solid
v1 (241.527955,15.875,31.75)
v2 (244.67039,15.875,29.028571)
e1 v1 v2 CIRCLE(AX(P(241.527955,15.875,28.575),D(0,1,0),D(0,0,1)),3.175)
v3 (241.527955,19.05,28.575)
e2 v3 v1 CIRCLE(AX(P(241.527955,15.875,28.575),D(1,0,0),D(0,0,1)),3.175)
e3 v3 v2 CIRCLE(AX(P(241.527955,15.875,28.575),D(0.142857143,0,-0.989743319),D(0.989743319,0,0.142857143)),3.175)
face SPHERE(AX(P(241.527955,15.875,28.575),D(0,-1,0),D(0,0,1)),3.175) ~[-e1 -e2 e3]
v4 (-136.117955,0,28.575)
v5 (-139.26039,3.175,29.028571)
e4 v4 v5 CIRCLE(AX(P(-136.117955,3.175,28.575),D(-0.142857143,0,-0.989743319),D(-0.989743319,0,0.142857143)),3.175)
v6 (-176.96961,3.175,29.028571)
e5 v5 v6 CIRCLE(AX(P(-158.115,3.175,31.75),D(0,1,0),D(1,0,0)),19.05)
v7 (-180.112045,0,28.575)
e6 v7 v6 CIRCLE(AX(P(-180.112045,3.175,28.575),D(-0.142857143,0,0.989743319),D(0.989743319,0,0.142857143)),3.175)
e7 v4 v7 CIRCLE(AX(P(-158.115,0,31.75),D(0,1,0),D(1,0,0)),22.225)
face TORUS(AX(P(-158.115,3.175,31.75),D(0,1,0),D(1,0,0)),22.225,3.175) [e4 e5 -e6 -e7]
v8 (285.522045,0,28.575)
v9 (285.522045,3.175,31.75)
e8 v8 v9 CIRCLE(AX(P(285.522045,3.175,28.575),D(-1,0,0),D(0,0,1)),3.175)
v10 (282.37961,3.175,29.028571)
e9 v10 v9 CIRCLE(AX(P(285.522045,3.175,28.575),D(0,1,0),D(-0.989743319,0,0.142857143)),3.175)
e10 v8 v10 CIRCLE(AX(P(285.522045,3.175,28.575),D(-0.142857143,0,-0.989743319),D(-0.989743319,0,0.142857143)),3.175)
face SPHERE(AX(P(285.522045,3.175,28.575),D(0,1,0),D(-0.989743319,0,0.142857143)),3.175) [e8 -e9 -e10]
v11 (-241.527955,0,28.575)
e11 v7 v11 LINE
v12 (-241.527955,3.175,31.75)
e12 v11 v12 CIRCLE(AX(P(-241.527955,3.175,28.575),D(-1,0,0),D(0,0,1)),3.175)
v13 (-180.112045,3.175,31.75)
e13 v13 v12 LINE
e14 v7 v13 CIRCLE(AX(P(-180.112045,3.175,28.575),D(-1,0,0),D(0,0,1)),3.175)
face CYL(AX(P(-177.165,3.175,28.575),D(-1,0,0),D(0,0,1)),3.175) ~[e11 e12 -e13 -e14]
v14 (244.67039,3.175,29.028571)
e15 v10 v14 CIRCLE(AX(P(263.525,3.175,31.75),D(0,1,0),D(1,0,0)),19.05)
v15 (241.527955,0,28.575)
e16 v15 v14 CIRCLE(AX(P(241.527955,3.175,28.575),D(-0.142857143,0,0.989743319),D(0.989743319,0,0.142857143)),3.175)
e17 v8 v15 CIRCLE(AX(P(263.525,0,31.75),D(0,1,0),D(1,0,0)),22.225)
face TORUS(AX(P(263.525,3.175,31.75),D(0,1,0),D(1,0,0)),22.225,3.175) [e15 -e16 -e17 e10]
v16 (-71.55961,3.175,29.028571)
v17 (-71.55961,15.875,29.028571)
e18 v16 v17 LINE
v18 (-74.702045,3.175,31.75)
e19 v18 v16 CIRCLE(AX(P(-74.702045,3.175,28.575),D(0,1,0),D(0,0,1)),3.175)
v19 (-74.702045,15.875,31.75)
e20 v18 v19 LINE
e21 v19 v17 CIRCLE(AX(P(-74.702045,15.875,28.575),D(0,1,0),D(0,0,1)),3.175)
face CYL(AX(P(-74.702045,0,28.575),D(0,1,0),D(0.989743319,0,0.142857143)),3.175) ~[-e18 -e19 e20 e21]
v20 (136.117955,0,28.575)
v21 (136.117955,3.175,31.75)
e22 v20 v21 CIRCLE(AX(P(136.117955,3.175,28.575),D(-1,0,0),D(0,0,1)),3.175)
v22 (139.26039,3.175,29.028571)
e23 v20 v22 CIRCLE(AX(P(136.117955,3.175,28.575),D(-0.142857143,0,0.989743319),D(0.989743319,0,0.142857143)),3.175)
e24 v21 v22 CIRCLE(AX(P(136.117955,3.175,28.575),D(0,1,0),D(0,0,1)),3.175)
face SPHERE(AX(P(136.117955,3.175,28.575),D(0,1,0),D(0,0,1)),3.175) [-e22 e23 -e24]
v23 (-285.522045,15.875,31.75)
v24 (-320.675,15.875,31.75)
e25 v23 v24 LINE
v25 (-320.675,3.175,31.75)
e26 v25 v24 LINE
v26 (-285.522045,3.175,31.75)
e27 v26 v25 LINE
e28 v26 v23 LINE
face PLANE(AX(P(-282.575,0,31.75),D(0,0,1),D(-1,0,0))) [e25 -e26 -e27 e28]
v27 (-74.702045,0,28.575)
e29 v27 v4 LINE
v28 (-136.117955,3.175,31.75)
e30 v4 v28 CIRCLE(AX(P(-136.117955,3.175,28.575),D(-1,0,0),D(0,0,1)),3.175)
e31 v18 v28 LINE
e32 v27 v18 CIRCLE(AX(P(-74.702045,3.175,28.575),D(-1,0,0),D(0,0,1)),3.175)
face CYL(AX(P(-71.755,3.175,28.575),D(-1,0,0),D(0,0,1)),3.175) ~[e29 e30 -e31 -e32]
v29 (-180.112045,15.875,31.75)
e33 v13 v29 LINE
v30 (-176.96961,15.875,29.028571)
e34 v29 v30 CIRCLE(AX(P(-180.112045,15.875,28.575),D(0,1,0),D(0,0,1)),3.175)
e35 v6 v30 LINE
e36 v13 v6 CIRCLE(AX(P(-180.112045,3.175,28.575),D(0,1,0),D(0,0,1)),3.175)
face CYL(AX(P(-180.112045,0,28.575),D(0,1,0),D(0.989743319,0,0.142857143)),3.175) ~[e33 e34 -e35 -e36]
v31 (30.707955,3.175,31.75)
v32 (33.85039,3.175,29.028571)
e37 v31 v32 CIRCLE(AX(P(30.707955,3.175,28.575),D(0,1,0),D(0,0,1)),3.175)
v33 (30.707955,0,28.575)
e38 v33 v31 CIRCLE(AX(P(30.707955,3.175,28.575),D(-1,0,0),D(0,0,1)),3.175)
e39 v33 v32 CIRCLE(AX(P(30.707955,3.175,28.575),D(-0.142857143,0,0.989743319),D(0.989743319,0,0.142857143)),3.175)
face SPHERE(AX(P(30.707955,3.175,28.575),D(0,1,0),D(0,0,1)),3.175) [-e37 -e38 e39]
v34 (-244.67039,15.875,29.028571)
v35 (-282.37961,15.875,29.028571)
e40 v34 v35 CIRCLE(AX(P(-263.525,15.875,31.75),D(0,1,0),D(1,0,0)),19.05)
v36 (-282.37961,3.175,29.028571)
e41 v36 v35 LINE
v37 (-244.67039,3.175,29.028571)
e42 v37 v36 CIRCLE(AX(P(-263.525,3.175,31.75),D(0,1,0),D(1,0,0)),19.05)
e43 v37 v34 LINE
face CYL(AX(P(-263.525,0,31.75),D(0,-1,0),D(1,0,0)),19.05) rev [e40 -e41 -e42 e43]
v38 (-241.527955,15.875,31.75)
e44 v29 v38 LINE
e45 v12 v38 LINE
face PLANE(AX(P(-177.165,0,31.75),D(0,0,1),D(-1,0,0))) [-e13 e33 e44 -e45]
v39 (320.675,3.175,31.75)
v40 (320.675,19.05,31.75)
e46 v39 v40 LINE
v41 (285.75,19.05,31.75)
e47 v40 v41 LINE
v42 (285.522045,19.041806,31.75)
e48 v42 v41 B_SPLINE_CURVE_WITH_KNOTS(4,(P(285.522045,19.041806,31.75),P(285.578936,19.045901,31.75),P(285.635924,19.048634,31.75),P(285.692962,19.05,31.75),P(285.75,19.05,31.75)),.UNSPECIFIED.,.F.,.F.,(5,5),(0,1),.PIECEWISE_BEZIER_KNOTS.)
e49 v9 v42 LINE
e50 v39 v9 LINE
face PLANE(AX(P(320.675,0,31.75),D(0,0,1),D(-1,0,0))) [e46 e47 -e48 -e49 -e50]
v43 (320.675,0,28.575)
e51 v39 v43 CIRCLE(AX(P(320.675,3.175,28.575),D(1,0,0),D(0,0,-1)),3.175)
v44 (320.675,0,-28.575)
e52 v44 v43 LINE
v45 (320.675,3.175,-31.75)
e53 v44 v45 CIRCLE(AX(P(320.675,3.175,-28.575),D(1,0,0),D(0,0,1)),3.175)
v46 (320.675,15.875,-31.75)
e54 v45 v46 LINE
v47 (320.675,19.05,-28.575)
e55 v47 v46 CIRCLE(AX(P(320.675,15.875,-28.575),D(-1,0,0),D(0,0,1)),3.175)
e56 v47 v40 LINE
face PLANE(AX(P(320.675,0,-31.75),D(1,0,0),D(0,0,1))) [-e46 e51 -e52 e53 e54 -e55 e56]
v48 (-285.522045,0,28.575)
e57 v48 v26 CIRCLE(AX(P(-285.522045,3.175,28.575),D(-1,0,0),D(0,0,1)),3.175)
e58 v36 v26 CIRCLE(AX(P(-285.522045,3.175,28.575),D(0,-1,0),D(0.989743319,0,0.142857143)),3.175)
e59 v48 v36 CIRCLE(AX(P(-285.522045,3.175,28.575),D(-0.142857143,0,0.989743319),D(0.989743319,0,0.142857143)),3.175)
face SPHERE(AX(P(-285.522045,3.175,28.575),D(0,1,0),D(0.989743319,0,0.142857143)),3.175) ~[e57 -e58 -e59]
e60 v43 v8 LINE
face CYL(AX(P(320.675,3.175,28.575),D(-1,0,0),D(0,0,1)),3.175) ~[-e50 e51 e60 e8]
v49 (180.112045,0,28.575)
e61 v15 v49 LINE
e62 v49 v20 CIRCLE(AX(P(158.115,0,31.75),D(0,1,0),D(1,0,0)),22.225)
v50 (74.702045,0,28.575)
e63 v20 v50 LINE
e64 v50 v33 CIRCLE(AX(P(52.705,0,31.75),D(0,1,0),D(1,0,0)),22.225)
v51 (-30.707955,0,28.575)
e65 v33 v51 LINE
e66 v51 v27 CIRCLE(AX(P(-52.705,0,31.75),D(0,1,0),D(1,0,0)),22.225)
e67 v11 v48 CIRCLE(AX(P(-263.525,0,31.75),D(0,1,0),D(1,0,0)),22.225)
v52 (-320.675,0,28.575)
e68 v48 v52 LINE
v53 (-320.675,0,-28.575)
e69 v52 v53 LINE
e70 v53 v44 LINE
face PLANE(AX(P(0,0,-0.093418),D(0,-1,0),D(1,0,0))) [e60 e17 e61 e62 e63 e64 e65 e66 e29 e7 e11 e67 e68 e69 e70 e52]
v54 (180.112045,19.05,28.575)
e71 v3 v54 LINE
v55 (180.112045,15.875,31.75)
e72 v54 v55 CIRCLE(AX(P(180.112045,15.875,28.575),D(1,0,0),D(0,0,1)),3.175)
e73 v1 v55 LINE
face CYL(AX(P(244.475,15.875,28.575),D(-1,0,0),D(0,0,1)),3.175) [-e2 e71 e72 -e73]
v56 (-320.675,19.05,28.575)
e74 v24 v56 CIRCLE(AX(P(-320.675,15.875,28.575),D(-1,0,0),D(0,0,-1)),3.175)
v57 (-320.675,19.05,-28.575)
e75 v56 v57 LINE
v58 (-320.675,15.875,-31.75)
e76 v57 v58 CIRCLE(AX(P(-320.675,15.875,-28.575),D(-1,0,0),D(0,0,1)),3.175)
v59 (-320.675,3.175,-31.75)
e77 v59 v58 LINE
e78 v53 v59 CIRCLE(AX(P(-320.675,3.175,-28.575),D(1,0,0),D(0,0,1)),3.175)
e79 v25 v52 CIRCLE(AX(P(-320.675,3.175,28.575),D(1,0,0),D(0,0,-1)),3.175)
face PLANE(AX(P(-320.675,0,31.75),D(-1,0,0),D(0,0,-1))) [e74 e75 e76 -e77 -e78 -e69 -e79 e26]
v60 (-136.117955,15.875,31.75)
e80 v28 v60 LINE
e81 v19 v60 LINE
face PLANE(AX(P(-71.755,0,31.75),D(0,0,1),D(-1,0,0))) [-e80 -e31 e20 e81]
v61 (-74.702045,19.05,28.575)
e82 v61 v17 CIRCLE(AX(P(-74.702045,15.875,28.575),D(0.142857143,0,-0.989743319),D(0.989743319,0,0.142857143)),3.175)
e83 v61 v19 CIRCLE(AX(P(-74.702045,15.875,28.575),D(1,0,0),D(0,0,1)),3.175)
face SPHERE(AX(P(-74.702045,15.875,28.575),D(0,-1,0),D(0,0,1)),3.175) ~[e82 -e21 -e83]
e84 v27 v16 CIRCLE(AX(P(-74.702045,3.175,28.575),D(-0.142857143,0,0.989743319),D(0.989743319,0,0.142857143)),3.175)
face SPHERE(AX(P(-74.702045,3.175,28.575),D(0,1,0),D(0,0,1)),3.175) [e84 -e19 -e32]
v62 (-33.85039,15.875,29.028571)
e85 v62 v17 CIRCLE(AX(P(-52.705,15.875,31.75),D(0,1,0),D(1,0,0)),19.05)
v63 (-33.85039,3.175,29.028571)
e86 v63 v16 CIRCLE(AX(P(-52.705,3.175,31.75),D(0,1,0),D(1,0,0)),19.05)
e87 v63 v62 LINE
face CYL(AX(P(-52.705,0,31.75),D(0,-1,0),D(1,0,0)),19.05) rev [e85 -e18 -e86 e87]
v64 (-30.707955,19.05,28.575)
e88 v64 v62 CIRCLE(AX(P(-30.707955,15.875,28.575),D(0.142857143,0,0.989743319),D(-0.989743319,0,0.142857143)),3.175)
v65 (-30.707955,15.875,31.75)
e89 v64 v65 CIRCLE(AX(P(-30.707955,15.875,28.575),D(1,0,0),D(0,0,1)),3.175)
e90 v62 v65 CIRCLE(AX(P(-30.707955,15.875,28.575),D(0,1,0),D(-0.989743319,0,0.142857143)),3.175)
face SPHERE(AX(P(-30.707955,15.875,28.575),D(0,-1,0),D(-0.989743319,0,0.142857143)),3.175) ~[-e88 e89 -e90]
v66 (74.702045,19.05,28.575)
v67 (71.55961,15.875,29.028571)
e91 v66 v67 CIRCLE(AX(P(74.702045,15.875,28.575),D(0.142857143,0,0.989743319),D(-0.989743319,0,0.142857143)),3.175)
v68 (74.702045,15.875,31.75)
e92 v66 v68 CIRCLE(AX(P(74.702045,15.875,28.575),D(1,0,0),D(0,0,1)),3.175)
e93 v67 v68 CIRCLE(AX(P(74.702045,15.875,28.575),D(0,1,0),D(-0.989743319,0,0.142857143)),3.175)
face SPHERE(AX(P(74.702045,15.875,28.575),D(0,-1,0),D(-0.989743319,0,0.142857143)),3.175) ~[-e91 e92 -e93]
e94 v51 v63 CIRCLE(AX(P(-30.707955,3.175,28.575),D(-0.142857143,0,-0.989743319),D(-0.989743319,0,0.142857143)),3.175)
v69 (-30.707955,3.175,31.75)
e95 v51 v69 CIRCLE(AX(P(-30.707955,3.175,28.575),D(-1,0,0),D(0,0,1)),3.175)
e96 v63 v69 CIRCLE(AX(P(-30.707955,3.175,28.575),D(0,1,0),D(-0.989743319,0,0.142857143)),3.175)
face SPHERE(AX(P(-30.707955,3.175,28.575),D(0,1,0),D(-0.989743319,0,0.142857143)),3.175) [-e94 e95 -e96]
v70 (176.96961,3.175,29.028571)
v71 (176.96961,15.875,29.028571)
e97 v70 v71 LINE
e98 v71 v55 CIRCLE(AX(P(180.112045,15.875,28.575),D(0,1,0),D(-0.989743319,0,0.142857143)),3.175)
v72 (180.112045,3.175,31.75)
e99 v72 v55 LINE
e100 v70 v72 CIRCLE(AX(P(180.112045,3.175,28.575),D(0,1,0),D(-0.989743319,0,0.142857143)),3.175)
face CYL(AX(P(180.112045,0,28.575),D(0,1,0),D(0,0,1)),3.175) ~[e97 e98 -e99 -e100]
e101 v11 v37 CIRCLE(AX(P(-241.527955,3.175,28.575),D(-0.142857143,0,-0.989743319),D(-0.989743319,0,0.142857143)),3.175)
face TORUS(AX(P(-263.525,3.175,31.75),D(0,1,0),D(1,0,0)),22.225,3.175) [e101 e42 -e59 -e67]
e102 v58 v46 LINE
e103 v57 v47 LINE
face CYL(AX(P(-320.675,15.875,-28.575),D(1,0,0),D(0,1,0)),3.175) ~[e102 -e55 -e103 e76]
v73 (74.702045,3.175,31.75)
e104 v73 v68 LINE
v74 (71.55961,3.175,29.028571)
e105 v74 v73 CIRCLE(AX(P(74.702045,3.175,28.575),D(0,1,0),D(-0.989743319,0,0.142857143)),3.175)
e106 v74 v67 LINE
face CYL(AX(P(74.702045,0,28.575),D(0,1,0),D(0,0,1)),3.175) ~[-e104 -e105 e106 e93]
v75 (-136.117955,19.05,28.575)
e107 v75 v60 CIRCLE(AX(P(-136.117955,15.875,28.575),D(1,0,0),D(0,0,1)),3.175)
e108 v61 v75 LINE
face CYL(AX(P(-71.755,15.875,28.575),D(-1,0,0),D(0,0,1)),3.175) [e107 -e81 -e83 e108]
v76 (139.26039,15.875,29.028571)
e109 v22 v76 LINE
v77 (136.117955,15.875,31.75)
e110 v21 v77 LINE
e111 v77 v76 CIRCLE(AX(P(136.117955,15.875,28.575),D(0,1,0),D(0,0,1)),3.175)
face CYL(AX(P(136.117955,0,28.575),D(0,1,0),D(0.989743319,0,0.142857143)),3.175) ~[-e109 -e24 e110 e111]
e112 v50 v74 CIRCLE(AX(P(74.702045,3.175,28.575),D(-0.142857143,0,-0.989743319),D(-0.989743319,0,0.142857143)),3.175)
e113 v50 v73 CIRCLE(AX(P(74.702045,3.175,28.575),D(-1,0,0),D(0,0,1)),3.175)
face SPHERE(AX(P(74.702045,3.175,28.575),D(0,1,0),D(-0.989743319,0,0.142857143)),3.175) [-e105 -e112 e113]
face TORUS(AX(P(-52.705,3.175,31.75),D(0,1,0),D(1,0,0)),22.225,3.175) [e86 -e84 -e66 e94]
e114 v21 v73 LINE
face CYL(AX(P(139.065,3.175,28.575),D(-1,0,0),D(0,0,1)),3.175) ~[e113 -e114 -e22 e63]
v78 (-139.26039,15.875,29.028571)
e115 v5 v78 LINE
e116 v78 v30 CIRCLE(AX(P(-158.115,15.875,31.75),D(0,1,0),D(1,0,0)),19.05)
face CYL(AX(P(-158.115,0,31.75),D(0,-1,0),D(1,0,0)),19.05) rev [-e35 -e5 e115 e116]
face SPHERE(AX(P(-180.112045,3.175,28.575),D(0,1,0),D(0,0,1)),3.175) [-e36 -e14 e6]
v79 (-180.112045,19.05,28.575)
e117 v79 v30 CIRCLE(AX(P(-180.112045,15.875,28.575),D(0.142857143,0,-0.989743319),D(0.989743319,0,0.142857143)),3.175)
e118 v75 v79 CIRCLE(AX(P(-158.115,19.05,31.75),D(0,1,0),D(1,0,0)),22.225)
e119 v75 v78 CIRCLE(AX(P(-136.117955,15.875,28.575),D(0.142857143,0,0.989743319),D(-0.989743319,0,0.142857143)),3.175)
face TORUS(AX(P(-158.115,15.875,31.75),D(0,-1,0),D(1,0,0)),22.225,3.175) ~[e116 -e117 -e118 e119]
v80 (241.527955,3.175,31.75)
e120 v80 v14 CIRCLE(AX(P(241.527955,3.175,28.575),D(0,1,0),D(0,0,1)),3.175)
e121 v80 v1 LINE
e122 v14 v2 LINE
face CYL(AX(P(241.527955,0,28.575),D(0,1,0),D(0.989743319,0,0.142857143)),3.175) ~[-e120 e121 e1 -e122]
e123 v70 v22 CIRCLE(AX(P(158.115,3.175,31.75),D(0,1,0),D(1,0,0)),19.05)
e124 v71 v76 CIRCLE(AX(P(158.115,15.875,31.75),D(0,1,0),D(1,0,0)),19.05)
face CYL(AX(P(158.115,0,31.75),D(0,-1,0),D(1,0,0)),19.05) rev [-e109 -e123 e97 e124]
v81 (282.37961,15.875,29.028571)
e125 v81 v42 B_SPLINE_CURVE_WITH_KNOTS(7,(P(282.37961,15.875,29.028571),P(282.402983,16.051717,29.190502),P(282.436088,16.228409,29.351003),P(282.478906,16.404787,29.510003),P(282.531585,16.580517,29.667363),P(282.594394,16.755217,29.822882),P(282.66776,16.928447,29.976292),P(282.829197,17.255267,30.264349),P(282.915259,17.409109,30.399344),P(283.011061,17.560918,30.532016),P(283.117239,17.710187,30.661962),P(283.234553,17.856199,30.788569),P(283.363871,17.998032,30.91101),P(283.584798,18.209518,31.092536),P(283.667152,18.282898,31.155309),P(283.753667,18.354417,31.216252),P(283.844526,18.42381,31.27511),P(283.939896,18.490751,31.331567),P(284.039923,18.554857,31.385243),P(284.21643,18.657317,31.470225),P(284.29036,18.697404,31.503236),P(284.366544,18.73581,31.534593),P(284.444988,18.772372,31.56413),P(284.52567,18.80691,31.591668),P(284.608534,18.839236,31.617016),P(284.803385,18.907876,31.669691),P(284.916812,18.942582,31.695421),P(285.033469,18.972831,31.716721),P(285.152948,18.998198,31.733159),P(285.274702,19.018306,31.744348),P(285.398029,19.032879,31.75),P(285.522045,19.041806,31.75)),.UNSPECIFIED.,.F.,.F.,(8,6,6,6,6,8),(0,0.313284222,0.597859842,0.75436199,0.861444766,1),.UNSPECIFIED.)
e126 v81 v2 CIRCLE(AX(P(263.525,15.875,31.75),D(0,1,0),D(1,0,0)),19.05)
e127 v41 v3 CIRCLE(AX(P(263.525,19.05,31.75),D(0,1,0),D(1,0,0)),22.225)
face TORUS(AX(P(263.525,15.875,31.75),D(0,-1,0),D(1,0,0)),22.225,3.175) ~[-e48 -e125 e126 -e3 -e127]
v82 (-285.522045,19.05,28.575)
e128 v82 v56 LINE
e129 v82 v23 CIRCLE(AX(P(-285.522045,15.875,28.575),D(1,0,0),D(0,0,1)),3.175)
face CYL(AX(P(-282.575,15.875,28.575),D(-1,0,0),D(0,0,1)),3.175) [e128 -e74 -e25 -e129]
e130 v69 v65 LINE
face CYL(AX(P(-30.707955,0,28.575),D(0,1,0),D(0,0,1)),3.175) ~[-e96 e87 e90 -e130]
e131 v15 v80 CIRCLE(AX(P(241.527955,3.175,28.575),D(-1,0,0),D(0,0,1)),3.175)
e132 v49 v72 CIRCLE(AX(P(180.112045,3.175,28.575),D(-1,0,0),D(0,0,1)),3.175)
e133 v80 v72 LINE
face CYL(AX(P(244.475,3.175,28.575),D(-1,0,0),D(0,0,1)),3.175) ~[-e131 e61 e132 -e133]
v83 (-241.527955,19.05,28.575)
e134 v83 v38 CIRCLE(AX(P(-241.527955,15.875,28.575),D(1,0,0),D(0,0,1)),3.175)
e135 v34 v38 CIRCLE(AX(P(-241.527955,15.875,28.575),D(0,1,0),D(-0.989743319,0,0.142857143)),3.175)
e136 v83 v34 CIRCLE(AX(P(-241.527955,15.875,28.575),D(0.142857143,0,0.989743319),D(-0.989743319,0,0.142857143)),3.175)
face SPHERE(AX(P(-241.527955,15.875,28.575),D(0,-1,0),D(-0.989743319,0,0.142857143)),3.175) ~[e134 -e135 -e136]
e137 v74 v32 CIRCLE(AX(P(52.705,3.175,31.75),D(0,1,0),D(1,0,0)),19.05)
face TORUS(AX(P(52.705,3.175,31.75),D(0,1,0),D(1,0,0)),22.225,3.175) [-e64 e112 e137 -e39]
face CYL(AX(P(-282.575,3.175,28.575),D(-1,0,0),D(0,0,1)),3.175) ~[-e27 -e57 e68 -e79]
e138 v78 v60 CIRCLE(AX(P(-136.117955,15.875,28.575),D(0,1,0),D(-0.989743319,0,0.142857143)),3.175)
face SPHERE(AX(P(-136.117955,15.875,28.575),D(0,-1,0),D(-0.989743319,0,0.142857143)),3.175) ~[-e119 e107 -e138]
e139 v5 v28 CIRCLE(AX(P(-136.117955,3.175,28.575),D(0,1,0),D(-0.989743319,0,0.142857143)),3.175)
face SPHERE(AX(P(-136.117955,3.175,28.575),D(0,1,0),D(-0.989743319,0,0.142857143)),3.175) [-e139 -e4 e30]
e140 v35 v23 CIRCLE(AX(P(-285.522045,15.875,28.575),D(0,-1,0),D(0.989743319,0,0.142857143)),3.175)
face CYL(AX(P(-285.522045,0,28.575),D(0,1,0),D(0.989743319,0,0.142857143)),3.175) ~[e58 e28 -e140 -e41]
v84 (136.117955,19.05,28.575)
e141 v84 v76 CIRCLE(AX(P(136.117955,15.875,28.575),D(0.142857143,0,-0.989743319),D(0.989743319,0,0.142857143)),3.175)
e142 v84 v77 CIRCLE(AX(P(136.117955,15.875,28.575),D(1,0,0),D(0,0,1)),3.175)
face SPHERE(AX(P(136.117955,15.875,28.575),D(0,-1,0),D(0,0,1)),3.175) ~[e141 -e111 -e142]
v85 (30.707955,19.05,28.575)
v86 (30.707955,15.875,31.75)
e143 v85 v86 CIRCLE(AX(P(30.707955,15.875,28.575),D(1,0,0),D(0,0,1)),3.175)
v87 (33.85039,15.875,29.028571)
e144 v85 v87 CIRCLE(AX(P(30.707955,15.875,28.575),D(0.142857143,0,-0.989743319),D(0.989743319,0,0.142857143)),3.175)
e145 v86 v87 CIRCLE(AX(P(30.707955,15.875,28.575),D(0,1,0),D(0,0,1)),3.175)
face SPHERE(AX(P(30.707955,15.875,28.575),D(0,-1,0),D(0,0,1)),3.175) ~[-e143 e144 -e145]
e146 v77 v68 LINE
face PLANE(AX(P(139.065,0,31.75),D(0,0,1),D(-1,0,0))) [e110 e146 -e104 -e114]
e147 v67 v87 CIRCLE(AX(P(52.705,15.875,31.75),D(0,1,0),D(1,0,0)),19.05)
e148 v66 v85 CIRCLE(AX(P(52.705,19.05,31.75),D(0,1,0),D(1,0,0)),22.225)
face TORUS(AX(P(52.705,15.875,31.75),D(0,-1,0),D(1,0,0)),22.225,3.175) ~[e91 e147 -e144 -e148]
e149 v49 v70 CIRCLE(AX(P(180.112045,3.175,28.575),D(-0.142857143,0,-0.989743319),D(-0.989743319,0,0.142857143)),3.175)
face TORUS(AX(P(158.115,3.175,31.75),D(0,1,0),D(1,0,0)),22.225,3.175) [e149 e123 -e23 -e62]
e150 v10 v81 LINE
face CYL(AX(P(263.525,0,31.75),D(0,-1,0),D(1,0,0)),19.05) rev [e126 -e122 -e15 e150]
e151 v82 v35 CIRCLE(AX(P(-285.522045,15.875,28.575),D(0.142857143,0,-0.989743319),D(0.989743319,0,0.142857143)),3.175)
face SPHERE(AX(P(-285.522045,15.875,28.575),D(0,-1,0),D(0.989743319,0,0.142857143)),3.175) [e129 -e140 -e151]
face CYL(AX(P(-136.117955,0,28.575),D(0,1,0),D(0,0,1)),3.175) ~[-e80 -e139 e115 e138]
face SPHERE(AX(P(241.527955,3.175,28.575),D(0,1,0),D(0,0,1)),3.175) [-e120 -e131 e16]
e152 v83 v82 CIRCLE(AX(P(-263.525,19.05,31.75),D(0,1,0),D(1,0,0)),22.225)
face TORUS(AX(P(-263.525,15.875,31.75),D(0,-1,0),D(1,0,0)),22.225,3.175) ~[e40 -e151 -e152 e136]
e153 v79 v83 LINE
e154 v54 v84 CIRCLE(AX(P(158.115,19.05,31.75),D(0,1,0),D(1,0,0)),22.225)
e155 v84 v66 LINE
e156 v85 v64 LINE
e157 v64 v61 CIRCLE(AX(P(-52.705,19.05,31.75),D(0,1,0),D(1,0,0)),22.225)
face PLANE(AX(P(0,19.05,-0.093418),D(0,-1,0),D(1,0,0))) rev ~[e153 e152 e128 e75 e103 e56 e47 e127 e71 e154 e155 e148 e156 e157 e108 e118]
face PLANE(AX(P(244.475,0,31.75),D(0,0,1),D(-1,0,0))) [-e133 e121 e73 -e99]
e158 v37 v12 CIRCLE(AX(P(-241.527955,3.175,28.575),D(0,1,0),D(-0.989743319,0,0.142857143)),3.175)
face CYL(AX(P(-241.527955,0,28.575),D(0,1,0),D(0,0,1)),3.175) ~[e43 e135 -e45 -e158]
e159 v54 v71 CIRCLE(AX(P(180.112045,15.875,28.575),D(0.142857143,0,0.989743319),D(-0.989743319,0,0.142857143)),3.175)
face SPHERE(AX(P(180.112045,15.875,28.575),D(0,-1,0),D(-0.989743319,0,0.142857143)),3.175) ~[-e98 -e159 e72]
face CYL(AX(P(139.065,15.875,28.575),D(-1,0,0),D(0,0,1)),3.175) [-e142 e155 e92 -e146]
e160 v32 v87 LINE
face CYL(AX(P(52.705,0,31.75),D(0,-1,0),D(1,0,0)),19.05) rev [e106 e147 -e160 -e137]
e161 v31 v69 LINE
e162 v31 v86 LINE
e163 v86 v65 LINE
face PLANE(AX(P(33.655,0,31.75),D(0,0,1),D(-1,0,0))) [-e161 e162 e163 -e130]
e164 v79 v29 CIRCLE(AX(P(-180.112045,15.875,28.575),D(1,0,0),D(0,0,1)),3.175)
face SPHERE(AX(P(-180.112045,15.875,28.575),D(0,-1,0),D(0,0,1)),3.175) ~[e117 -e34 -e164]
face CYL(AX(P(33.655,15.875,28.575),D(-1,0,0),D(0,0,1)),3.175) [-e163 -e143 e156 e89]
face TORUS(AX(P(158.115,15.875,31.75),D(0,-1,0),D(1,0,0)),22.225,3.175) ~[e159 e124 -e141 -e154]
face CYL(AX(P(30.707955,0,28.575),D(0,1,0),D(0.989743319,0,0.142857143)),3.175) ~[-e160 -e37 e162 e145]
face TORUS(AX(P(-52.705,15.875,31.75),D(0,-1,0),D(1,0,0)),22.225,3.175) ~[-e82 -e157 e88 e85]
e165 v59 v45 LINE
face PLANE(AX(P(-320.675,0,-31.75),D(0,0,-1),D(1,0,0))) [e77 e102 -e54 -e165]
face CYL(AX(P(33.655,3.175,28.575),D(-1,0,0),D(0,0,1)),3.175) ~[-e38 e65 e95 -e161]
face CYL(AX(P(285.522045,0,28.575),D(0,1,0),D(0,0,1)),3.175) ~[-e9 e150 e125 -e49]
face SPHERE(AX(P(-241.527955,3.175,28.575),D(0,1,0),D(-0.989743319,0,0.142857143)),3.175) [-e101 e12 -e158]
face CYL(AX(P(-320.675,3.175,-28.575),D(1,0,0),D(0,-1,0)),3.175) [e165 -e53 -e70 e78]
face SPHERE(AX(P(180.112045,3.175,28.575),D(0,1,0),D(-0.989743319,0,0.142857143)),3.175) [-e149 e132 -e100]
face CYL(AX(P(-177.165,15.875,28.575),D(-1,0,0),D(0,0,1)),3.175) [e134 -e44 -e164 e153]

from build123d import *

# Parameters (mm, degrees)
F1_DEPTH = 19.05
F2_R     = 3.175
F3_R     = 3.175


with BuildPart() as f1:
    # F0 (on Front) → F1 (new body)
    with BuildSketch(Plane.XZ):
        with BuildLine():
            Line((-320.675, 31.75), (-320.675, -31.75))
            Line((-320.675, -31.75), (320.675, -31.75))
            Line((320.675, -31.75), (320.675, 31.75))
            Line((320.675, 31.75), (282.575, 31.75))
            ThreePointArc((282.575, 31.75), (263.525, 12.7), (244.475, 31.75))
            Line((244.475, 31.75), (177.165, 31.75))
            ThreePointArc((177.165, 31.75), (158.115, 12.7), (139.065, 31.75))
            Line((139.065, 31.75), (71.755, 31.75))
            ThreePointArc((71.755, 31.75), (52.705, 12.7), (33.655, 31.75))
            Line((33.655, 31.75), (-33.655, 31.75))
            ThreePointArc((-33.655, 31.75), (-52.705, 12.7), (-71.755, 31.75))
            Line((-71.755, 31.75), (-139.065, 31.75))
            ThreePointArc((-139.065, 31.75), (-158.115, 12.7), (-177.165, 31.75))
            Line((-177.165, 31.75), (-244.475, 31.75))
            ThreePointArc((-244.475, 31.75), (-263.525, 12.7), (-282.575, 31.75))
            Line((-282.575, 31.75), (-320.675, 31.75))
        make_face()
    extrude(amount=-F1_DEPTH)

    # F2
    f2_edges = [f1.edges().sort_by_distance(p)[0] for p in [
        (-244.475, 9.525, 31.75),
        (-282.575, 9.525, 31.75),
        (-263.525, 0, 12.7),
        (-263.525, 19.05, 12.7),
        (-301.625, 0, 31.75),
        (-301.625, 19.05, 31.75),
        (-177.165, 9.525, 31.75),
        (-210.82, 0, 31.75),
        (-210.82, 19.05, 31.75),
        (-139.065, 9.525, 31.75),
        (-158.115, 0, 12.7),
        (-158.115, 19.05, 12.7),
        (-71.755, 9.525, 31.75),
        (-105.41, 0, 31.75),
        (-105.41, 19.05, 31.75),
        (-33.655, 9.525, 31.75),
        (-52.705, 0, 12.7),
        (-52.705, 19.05, 12.7),
        (33.655, 9.525, 31.75),
        (0, 0, 31.75),
        (0, 19.05, 31.75),
        (71.755, 9.525, 31.75),
        (52.705, 0, 12.7),
        (52.705, 19.05, 12.7),
        (139.065, 9.525, 31.75),
        (105.41, 0, 31.75),
        (105.41, 19.05, 31.75),
        (177.165, 9.525, 31.75),
        (158.115, 0, 12.7),
        (158.115, 19.05, 12.7),
        (244.475, 9.525, 31.75),
        (210.82, 0, 31.75),
        (210.82, 19.05, 31.75),
        (282.575, 9.525, 31.75),
        (263.525, 0, 12.7),
        (263.525, 19.05, 12.7),
        (301.625, 0, 31.75),
    ]]
    fillet(f2_edges, radius=F2_R)

    # F3
    f3_edges = [f1.edges().sort_by_distance(p)[0] for p in [
        (0, 0, -31.75),
        (0, 19.05, -31.75),
    ]]
    fillet(f3_edges, radius=F3_R)


solid = f1.part
